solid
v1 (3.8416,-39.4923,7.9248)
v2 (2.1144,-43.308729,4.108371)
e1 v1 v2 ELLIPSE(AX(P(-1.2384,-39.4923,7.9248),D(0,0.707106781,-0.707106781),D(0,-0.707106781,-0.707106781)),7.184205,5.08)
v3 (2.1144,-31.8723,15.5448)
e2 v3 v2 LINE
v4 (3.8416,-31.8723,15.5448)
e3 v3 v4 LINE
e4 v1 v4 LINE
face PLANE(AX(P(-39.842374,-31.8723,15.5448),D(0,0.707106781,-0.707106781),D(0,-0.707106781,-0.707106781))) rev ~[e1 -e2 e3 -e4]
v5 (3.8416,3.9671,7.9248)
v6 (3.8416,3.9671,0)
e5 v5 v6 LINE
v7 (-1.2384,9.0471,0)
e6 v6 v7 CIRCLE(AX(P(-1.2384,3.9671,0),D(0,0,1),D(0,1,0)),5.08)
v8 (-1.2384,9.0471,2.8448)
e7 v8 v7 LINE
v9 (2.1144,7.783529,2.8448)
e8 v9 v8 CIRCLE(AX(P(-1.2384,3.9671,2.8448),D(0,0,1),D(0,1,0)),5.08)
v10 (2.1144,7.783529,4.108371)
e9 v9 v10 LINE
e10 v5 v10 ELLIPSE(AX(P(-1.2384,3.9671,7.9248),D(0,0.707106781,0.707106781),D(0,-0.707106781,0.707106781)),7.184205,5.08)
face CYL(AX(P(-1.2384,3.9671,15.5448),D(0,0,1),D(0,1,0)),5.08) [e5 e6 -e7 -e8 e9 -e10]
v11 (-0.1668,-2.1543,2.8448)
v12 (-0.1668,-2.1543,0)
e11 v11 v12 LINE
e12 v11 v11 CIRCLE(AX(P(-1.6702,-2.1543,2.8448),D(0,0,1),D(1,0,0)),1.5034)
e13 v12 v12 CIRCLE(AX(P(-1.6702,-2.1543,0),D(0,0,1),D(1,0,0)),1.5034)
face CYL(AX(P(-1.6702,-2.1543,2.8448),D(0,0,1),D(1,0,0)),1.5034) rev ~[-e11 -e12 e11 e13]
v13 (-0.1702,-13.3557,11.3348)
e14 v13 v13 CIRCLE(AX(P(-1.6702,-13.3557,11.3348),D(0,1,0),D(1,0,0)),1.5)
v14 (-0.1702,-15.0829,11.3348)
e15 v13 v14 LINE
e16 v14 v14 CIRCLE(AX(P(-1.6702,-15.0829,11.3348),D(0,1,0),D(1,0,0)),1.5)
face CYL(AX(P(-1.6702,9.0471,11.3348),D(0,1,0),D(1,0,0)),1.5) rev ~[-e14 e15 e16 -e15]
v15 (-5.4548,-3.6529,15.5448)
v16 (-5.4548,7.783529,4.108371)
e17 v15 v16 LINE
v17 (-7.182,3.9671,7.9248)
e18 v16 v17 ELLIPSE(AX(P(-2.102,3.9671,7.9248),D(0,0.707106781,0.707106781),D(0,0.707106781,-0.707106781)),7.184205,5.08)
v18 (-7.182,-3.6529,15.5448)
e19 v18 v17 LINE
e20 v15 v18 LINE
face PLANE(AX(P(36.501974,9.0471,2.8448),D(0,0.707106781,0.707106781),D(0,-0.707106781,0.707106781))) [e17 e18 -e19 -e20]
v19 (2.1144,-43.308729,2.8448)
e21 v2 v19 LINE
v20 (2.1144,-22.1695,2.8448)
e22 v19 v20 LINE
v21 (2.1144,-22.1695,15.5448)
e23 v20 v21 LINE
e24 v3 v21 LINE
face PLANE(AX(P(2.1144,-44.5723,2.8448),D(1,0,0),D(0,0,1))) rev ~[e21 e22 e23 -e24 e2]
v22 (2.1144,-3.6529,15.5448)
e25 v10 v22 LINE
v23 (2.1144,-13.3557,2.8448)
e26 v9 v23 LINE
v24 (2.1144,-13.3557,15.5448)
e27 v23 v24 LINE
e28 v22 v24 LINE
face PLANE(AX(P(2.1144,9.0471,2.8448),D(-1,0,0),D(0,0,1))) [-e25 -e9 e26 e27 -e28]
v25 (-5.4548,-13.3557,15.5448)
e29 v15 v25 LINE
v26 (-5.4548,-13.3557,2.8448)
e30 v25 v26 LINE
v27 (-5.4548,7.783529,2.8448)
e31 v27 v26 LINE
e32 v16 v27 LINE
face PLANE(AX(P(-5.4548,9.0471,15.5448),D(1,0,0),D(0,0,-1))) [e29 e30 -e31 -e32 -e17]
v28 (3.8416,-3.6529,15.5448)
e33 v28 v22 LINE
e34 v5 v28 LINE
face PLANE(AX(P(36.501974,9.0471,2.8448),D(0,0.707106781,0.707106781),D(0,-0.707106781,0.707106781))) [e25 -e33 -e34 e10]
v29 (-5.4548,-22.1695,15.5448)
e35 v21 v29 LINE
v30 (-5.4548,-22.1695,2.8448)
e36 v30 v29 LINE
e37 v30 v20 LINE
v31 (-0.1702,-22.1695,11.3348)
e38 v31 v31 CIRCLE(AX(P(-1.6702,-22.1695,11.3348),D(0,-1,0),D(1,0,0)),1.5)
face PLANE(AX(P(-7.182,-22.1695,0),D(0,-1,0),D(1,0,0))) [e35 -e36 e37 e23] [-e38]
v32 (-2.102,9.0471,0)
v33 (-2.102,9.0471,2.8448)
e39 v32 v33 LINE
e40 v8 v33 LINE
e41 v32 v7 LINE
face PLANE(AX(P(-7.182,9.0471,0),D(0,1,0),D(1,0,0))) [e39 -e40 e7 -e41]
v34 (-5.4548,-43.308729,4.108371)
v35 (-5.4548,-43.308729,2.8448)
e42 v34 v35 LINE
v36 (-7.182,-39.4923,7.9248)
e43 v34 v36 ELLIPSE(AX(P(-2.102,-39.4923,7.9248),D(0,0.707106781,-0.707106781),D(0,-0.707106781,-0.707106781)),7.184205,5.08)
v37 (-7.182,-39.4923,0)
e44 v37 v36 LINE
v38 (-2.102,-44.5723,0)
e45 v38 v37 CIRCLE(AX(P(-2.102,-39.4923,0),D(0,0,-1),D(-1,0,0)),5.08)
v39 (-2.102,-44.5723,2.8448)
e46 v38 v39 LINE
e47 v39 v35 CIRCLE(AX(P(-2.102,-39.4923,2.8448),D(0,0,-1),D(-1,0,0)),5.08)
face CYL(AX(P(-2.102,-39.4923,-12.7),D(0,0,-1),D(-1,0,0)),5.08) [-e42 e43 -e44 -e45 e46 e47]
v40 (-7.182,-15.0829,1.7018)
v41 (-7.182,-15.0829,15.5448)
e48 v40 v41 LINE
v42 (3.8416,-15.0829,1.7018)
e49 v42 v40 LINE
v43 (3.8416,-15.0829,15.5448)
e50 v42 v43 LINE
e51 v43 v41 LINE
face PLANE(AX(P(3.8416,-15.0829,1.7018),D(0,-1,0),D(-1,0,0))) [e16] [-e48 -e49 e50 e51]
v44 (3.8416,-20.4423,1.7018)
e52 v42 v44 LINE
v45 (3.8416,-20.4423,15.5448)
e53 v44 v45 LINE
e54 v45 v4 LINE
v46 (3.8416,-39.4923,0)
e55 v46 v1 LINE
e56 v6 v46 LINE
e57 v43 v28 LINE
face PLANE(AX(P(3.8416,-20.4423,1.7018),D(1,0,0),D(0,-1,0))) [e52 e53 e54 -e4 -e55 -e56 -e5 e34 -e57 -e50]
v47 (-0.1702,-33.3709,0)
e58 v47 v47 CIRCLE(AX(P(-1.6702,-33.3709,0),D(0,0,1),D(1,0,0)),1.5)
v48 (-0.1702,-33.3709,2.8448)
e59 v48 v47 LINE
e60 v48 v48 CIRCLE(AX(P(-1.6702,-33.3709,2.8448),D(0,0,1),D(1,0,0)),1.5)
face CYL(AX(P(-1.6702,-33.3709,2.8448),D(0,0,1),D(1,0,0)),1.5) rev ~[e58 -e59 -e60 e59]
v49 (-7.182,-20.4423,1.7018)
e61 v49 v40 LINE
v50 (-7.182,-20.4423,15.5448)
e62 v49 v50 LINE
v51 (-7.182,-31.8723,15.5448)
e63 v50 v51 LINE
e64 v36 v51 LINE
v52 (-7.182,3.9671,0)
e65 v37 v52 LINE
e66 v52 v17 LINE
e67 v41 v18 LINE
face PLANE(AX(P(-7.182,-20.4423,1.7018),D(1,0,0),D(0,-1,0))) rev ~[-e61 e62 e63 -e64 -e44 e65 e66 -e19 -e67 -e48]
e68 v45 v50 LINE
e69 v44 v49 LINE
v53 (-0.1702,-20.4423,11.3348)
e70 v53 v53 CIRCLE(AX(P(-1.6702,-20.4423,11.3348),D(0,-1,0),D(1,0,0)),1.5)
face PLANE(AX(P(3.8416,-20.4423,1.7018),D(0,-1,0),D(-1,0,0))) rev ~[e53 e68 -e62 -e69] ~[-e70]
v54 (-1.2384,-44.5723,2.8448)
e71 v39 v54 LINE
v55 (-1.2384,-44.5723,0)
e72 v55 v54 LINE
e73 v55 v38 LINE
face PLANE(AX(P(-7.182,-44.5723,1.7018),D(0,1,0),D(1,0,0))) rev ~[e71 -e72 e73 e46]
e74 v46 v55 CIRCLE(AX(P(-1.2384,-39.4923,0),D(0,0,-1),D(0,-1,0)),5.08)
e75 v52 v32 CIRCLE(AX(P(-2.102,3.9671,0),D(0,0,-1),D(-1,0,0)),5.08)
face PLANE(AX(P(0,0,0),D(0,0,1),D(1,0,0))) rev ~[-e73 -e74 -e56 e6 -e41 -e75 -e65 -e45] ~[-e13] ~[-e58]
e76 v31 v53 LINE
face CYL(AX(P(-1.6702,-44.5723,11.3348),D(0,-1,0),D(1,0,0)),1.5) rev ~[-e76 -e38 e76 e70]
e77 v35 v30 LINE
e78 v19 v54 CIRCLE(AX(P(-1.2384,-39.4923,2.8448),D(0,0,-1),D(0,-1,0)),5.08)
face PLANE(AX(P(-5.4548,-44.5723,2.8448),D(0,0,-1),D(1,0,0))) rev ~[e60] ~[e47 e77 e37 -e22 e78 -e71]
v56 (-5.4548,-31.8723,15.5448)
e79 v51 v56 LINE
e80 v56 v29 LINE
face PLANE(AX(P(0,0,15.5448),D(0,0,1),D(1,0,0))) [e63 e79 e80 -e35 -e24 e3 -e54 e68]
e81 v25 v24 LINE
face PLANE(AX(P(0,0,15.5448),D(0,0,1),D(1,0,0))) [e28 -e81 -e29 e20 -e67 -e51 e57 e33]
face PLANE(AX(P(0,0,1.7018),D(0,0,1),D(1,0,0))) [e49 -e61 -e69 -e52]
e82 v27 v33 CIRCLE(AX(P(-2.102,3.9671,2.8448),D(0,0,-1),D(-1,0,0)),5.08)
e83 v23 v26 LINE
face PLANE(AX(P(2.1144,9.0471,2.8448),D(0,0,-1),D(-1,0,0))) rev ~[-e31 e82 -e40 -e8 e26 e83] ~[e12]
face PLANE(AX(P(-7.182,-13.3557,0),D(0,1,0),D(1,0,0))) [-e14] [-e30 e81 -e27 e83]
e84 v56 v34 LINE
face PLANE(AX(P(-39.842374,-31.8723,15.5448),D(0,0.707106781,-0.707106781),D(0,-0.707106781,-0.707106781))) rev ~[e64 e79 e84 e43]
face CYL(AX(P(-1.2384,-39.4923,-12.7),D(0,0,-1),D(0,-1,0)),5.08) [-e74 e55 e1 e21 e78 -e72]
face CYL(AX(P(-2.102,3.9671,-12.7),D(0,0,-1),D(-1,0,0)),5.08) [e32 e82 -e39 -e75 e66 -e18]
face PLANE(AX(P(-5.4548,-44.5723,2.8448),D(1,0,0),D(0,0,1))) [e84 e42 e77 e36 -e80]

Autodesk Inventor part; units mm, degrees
ref_plane "YZ Plane" through (0, 0, 0) normal (1, 0, 0) x (0, 1, 0)
ref_plane "XZ Plane" through (0, 0, 0) normal (0, 1, 0) x (-1, 0, 0)
ref_plane "XY Plane" through (0, 0, 0) normal (0, 0, 1) x (1, 0, 0)
sketch "Sketch1" plane through (0, 0, 0) normal (0, 0, 1) x (1, 0, 0)
  line L0 (-7.182, 9.0471) -> (3.8416, 9.0471)
  line L1 (3.8416, 9.0471) -> (3.8416, -44.5723)
  line L2 (3.8416, -44.5723) -> (-7.182, -44.5723)
  line L3 (-7.182, -44.5723) -> (-7.182, 9.0471)
  point P0 (0, 0)
  dimension "d0" = 11.0236
  dimension "d1" = 53.6194
extrude "Extrusion1" add sketch "Sketch1" along normal blind 1.7018
sketch "Sketch2" plane through (0, 0, 1.7018) normal (0, 0, 1) x (1, 0, 0)
  line L0 (3.8416, 9.0471) -> (-7.182, 9.0471) projected
  line L1 (3.8416, -44.5723) -> (3.8416, 9.0471) projected
  line L2 (-7.182, 9.0471) -> (3.8416, 9.0471)
  line L3 (3.8416, 9.0471) -> (3.8416, -15.0829)
  line L4 (3.8416, -15.0829) -> (-7.182, -15.0829)
  line L5 (-7.182, -15.0829) -> (-7.182, 9.0471)
  point P0 (0, 0)
  dimension "d4" = 24.13
extrude "Extrusion2" add sketch "Sketch2" along normal blind 13.843
sketch "Sketch3" plane through (-7.182, 9.0471, 0) normal (0, 1, 0) x (1, 0, 0)
  circle A0 centre (5.5118, -11.3348) radius 1.5
  line L0 (11.0236, -15.5448) -> (0, -15.5448) projected
  point P0 (7.182, 0)
  dimension "d7" = 3
  dimension "d8" = 4.21
extrude "Extrusion3" cut sketch "Sketch3" against normal blind 25.4
chamfer "Chamfer1" distance 12.7 angle 45 1 edges at (-1.6702, 9.0471, 15.5448)
sketch "Sketch4" plane through (-7.182, 9.0471, 0) normal (0, 1, 0) x (1, 0, 0)
  line L0 (11.0236, -2.8448) -> (0, -2.8448) projected
  line L1 (0, -15.5448) -> (11.0236, -15.5448) projected
  line L2 (1.7272, -2.8448) -> (9.2964, -2.8448)
  line L3 (9.2964, -2.8448) -> (9.2964, -15.5448)
  line L4 (9.2964, -15.5448) -> (1.7272, -15.5448)
  line L5 (1.7272, -15.5448) -> (1.7272, -2.8448)
  point P0 (7.182, 0)
  dimension "d14" = 1.7272
  dimension "d15" = 1.7272
extrude "Extrusion4" cut sketch "Sketch4" against normal blind 22.4028
sketch "Sketch5" plane through (0, 0, 1.7018) normal (0, 0, 1) x (1, 0, 0)
  line L0 (-7.182, -44.5723) -> (3.8416, -44.5723) projected
  line L1 (3.8416, 9.0471) -> (3.8416, -44.5723) projected
  line L2 (-7.182, -44.5723) -> (3.8416, -44.5723)
  line L3 (3.8416, -44.5723) -> (3.8416, -20.4423)
  line L4 (3.8416, -20.4423) -> (-7.182, -20.4423)
  line L5 (-7.182, -20.4423) -> (-7.182, -44.5723)
  point P0 (0, 0)
  dimension "d18" = 24.13
extrude "Extrusion5" add sketch "Sketch5" along normal blind 13.843
sketch "Sketch6" plane through (-7.182, -44.5723, 0) normal (0, -1, 0) x (1, 0, 0)
  circle A0 centre (5.5118, 11.3348) radius 1.5 projected
  circle A1 centre (5.5118, 11.3348) radius 1.5
  point P0 (7.182, 0)
extrude "Extrusion6" cut sketch "Sketch6" against normal blind 39.243
chamfer "Chamfer2" distance 12.7 angle 45 1 edges at (-1.6702, -44.5723, 15.5448)
sketch "Sketch7" plane through (-7.182, -44.5723, 0) normal (0, -1, 0) x (1, 0, 0)
  line L0 (1.7272, 2.8448) -> (9.2964, 2.8448) projected
  line L1 (9.2964, 2.8448) -> (9.2964, 15.5448) projected
  line L2 (9.2964, 15.5448) -> (1.7272, 15.5448) projected
  line L3 (9.2964, 2.8448) -> (1.7272, 2.8448)
  line L4 (1.7272, 2.8448) -> (1.7272, 15.5448)
  line L5 (1.7272, 15.5448) -> (9.2964, 15.5448)
  line L6 (9.2964, 15.5448) -> (9.2964, 2.8448)
  point P0 (7.182, 0)
extrude "Extrusion7" cut sketch "Sketch7" against normal blind 22.4028
sketch "Sketch8" plane through (-5.4548, -44.5723, 2.8448) normal (0, 0, 1) x (1, 0, 0)
  circle A0 centre (3.7846, 11.2014) radius 1.5
  circle A1 centre (3.7846, 42.418) radius 1.5034
  line L0 (0, 0) -> (7.5692, 0) projected
  line L1 (7.5692, 53.6194) -> (0, 53.6194) projected
  point P0 (5.4548, 44.5723)
  dimension "d28" = 3
  dimension "d29" = 3.0067
  dimension "d30" = 11.2014
  dimension "d31" = 11.2014
extrude "Extrusion8" cut sketch "Sketch8" against normal blind 22.4028
fillet "Fillet1" radius 5.08 4 edges at (-7.182, 9.0471, 1.4224) (3.8416, 9.0471, 1.4224) (-7.182, -44.5723, 1.4224) (3.8416, -44.5723, 1.4224)
equation "\"d15\" = d14"
equation "\"d31\" = d30"
properties part number "Control board Holder"
